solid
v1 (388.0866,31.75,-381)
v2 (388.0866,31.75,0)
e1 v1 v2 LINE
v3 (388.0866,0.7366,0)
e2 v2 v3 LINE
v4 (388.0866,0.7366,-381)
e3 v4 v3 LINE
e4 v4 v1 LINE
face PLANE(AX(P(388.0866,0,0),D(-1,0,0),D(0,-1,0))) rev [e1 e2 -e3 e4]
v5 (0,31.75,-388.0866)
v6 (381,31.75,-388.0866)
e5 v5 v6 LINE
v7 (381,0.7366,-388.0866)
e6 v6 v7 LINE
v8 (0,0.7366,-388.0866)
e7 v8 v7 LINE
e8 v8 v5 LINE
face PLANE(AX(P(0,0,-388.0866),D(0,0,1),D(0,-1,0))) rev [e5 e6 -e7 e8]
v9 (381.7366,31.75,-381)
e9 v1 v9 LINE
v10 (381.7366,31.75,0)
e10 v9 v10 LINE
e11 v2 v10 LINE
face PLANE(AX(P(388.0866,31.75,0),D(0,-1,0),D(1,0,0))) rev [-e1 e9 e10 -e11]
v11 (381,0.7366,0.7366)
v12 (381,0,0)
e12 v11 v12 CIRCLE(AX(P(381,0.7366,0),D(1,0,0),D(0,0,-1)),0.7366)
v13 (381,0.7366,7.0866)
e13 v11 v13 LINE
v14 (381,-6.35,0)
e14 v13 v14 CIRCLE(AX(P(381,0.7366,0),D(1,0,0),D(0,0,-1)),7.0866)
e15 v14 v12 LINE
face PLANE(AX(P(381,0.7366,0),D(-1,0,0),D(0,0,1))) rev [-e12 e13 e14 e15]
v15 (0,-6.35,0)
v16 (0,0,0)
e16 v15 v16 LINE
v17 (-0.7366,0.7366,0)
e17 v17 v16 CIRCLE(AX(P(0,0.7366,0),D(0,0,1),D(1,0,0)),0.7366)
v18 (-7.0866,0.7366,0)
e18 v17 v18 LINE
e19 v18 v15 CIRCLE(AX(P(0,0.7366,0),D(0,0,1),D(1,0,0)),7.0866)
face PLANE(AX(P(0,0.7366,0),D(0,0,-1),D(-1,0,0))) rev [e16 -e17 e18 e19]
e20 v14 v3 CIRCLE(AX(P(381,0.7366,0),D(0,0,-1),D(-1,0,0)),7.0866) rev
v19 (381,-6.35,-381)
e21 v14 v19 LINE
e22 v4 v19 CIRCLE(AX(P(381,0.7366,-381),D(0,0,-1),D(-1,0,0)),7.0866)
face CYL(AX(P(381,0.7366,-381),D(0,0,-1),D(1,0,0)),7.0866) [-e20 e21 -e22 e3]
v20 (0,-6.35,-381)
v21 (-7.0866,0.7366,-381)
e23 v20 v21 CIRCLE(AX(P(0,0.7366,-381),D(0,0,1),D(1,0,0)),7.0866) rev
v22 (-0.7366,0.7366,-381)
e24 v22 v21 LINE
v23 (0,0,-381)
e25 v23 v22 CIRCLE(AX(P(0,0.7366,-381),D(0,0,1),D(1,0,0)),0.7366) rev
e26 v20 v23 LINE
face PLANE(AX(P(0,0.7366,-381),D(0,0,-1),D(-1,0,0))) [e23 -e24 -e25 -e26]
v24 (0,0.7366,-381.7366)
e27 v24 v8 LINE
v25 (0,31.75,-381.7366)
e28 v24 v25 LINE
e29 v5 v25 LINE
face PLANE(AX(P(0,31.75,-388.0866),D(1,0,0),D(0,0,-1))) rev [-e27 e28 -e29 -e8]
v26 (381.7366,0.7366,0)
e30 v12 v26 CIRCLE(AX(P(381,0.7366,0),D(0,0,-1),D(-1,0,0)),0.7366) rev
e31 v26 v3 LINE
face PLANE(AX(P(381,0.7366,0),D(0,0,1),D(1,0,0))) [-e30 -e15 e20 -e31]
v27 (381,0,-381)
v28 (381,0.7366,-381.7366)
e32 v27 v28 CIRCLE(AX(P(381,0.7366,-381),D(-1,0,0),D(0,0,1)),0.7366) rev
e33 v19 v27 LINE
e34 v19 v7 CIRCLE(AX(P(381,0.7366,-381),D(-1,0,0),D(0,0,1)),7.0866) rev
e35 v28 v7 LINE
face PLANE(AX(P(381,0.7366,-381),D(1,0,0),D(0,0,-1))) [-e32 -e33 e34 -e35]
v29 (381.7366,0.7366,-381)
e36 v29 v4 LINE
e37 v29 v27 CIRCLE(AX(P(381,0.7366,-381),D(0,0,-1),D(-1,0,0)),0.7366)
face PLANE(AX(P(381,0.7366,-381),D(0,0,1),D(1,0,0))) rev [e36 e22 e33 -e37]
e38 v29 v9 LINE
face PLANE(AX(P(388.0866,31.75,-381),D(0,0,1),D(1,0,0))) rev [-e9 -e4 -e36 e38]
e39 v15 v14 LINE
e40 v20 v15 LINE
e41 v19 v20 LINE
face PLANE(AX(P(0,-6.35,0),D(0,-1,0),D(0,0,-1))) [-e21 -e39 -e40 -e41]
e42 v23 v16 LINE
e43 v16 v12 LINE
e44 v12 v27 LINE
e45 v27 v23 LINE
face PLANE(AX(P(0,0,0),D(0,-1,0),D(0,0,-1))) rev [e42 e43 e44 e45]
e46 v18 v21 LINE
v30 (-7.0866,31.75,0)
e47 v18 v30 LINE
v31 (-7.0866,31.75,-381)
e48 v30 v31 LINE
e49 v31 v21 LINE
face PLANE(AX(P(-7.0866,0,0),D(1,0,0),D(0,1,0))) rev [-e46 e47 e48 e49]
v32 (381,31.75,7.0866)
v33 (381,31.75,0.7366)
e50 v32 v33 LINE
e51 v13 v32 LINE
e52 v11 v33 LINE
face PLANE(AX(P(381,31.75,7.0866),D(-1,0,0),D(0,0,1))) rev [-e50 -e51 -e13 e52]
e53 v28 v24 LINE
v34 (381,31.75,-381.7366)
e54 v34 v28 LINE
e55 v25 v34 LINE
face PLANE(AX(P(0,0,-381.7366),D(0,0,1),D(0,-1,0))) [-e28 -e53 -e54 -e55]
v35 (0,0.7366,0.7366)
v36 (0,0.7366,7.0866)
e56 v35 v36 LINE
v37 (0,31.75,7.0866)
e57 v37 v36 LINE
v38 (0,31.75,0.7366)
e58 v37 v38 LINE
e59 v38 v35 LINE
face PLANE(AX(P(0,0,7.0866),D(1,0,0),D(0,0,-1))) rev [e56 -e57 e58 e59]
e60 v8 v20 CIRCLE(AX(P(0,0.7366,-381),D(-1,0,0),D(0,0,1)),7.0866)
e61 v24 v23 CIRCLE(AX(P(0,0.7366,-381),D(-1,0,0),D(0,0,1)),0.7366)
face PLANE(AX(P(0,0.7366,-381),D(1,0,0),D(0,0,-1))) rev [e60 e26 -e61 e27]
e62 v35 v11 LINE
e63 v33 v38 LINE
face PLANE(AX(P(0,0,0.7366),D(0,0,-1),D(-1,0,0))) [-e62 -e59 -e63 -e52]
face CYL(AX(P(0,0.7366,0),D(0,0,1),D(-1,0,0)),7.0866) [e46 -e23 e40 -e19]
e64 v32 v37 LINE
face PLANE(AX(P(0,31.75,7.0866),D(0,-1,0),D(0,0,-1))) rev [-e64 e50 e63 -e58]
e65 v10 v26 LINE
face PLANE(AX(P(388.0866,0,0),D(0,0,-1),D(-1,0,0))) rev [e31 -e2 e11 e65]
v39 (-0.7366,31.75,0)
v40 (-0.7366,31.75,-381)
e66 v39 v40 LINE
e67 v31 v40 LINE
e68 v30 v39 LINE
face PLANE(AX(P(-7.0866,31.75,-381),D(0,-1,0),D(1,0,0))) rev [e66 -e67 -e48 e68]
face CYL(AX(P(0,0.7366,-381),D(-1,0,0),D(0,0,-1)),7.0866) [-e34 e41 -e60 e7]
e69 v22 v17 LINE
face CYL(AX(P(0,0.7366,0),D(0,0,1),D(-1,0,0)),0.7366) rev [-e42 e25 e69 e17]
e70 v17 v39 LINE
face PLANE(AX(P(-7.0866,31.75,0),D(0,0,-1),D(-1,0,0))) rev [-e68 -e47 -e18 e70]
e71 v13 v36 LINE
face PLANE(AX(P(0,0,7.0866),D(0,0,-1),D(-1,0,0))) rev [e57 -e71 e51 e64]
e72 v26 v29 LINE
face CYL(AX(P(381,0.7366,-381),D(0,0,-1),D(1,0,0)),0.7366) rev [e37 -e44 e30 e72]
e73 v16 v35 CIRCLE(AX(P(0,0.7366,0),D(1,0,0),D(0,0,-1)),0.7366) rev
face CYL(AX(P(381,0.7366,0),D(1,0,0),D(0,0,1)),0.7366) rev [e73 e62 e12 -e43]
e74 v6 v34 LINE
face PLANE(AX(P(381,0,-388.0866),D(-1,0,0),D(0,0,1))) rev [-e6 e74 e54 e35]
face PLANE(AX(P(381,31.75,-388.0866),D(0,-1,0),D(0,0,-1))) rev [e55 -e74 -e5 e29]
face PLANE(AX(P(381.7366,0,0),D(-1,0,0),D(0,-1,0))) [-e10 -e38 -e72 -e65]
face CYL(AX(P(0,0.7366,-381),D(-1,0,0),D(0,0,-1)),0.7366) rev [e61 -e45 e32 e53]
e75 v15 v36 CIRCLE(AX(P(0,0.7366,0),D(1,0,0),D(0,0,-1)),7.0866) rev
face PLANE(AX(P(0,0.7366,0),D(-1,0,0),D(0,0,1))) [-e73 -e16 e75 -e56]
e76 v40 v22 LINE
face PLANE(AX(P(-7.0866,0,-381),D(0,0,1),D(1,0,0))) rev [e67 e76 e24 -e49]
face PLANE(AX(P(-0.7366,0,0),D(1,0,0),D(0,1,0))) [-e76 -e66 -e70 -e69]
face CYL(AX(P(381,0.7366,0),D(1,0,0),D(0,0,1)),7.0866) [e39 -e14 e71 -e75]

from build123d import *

# Parameters (mm, degrees)
SKETCH1_W          = 381
SKETCH1_H          = 381
BASE_FLANGE1_DEPTH = 6.35
EDGE_FLANGE3_DEPTH = 381
EDGE_FLANGE4_DEPTH = 381
EDGE_FLANGE5_DEPTH = 381
EDGE_FLANGE6_DEPTH = 381


# Sheet-metal steps are written as plain solids
with BuildPart() as part:
    # Sketch1 → Base-Flange1 (new body)
    with BuildSketch(Plane(origin=(0, 0, 0), x_dir=(1, 0, 0), z_dir=(0, 1, 0))):
        with Locations((190.5, 190.5)):
            Rectangle(SKETCH1_W, SKETCH1_H)
    extrude(amount=-BASE_FLANGE1_DEPTH)

    # Edge-Flange3 section (across the edge) → Edge-Flange3 (add)
    with BuildSketch(Plane(origin=(-0.7366, 0, -381), x_dir=(1, 0, 0), z_dir=(0, 0, 1))):
        with BuildLine():
            Line((-6.35, 0.7366), (-6.35, 31.75))
            Line((-6.35, 31.75), (0, 31.75))
            Line((0, 31.75), (0, 0.7366))
            ThreePointArc((0, 0.7366), (0.215745145, 0.215745145), (0.7366, 0))
            Line((0.7366, 0), (0.7366, -6.35))
            ThreePointArc((0.7366, -6.35), (-4.274382916, -4.274382916), (-6.35, 0.7366))
        make_face()
    extrude(amount=EDGE_FLANGE3_DEPTH)

    # Edge-Flange4 section (across the edge) → Edge-Flange4 (add)
    with BuildSketch(Plane(origin=(381, 0, -381.7366), x_dir=(0, 0, 1), z_dir=(-1, 0, 0))):
        with BuildLine():
            Line((-6.35, 0.7366), (-6.35, 31.75))
            Line((-6.35, 31.75), (0, 31.75))
            Line((0, 31.75), (0, 0.7366))
            ThreePointArc((0, 0.7366), (0.215745145, 0.215745145), (0.7366, 0))
            Line((0.7366, 0), (0.7366, -6.35))
            ThreePointArc((0.7366, -6.35), (-4.274382916, -4.274382916), (-6.35, 0.7366))
        make_face()
    extrude(amount=EDGE_FLANGE4_DEPTH)

    # Edge-Flange5 section (across the edge) → Edge-Flange5 (add)
    with BuildSketch(Plane(origin=(0, 0, 0.7366), x_dir=(0, 0, -1), z_dir=(1, 0, 0))):
        with BuildLine():
            Line((-6.35, 0.7366), (-6.35, 31.75))
            Line((-6.35, 31.75), (0, 31.75))
            Line((0, 31.75), (0, 0.7366))
            ThreePointArc((0, 0.7366), (0.215745145, 0.215745145), (0.7366, 0))
            Line((0.7366, 0), (0.7366, -6.35))
            ThreePointArc((0.7366, -6.35), (-4.274382916, -4.274382916), (-6.35, 0.7366))
        make_face()
    extrude(amount=EDGE_FLANGE5_DEPTH)

    # Edge-Flange6 section (across the edge) → Edge-Flange6 (add)
    with BuildSketch(Plane(origin=(381.7366, 0, 0), x_dir=(-1, 0, 0), z_dir=(0, 0, -1))):
        with BuildLine():
            Line((-6.35, 0.7366), (-6.35, 31.75))
            Line((-6.35, 31.75), (0, 31.75))
            Line((0, 31.75), (0, 0.7366))
            ThreePointArc((0, 0.7366), (0.215745145, 0.215745145), (0.7366, 0))
            Line((0.7366, 0), (0.7366, -6.35))
            ThreePointArc((0.7366, -6.35), (-4.274382916, -4.274382916), (-6.35, 0.7366))
        make_face()
    extrude(amount=EDGE_FLANGE6_DEPTH)


solid = part.part
